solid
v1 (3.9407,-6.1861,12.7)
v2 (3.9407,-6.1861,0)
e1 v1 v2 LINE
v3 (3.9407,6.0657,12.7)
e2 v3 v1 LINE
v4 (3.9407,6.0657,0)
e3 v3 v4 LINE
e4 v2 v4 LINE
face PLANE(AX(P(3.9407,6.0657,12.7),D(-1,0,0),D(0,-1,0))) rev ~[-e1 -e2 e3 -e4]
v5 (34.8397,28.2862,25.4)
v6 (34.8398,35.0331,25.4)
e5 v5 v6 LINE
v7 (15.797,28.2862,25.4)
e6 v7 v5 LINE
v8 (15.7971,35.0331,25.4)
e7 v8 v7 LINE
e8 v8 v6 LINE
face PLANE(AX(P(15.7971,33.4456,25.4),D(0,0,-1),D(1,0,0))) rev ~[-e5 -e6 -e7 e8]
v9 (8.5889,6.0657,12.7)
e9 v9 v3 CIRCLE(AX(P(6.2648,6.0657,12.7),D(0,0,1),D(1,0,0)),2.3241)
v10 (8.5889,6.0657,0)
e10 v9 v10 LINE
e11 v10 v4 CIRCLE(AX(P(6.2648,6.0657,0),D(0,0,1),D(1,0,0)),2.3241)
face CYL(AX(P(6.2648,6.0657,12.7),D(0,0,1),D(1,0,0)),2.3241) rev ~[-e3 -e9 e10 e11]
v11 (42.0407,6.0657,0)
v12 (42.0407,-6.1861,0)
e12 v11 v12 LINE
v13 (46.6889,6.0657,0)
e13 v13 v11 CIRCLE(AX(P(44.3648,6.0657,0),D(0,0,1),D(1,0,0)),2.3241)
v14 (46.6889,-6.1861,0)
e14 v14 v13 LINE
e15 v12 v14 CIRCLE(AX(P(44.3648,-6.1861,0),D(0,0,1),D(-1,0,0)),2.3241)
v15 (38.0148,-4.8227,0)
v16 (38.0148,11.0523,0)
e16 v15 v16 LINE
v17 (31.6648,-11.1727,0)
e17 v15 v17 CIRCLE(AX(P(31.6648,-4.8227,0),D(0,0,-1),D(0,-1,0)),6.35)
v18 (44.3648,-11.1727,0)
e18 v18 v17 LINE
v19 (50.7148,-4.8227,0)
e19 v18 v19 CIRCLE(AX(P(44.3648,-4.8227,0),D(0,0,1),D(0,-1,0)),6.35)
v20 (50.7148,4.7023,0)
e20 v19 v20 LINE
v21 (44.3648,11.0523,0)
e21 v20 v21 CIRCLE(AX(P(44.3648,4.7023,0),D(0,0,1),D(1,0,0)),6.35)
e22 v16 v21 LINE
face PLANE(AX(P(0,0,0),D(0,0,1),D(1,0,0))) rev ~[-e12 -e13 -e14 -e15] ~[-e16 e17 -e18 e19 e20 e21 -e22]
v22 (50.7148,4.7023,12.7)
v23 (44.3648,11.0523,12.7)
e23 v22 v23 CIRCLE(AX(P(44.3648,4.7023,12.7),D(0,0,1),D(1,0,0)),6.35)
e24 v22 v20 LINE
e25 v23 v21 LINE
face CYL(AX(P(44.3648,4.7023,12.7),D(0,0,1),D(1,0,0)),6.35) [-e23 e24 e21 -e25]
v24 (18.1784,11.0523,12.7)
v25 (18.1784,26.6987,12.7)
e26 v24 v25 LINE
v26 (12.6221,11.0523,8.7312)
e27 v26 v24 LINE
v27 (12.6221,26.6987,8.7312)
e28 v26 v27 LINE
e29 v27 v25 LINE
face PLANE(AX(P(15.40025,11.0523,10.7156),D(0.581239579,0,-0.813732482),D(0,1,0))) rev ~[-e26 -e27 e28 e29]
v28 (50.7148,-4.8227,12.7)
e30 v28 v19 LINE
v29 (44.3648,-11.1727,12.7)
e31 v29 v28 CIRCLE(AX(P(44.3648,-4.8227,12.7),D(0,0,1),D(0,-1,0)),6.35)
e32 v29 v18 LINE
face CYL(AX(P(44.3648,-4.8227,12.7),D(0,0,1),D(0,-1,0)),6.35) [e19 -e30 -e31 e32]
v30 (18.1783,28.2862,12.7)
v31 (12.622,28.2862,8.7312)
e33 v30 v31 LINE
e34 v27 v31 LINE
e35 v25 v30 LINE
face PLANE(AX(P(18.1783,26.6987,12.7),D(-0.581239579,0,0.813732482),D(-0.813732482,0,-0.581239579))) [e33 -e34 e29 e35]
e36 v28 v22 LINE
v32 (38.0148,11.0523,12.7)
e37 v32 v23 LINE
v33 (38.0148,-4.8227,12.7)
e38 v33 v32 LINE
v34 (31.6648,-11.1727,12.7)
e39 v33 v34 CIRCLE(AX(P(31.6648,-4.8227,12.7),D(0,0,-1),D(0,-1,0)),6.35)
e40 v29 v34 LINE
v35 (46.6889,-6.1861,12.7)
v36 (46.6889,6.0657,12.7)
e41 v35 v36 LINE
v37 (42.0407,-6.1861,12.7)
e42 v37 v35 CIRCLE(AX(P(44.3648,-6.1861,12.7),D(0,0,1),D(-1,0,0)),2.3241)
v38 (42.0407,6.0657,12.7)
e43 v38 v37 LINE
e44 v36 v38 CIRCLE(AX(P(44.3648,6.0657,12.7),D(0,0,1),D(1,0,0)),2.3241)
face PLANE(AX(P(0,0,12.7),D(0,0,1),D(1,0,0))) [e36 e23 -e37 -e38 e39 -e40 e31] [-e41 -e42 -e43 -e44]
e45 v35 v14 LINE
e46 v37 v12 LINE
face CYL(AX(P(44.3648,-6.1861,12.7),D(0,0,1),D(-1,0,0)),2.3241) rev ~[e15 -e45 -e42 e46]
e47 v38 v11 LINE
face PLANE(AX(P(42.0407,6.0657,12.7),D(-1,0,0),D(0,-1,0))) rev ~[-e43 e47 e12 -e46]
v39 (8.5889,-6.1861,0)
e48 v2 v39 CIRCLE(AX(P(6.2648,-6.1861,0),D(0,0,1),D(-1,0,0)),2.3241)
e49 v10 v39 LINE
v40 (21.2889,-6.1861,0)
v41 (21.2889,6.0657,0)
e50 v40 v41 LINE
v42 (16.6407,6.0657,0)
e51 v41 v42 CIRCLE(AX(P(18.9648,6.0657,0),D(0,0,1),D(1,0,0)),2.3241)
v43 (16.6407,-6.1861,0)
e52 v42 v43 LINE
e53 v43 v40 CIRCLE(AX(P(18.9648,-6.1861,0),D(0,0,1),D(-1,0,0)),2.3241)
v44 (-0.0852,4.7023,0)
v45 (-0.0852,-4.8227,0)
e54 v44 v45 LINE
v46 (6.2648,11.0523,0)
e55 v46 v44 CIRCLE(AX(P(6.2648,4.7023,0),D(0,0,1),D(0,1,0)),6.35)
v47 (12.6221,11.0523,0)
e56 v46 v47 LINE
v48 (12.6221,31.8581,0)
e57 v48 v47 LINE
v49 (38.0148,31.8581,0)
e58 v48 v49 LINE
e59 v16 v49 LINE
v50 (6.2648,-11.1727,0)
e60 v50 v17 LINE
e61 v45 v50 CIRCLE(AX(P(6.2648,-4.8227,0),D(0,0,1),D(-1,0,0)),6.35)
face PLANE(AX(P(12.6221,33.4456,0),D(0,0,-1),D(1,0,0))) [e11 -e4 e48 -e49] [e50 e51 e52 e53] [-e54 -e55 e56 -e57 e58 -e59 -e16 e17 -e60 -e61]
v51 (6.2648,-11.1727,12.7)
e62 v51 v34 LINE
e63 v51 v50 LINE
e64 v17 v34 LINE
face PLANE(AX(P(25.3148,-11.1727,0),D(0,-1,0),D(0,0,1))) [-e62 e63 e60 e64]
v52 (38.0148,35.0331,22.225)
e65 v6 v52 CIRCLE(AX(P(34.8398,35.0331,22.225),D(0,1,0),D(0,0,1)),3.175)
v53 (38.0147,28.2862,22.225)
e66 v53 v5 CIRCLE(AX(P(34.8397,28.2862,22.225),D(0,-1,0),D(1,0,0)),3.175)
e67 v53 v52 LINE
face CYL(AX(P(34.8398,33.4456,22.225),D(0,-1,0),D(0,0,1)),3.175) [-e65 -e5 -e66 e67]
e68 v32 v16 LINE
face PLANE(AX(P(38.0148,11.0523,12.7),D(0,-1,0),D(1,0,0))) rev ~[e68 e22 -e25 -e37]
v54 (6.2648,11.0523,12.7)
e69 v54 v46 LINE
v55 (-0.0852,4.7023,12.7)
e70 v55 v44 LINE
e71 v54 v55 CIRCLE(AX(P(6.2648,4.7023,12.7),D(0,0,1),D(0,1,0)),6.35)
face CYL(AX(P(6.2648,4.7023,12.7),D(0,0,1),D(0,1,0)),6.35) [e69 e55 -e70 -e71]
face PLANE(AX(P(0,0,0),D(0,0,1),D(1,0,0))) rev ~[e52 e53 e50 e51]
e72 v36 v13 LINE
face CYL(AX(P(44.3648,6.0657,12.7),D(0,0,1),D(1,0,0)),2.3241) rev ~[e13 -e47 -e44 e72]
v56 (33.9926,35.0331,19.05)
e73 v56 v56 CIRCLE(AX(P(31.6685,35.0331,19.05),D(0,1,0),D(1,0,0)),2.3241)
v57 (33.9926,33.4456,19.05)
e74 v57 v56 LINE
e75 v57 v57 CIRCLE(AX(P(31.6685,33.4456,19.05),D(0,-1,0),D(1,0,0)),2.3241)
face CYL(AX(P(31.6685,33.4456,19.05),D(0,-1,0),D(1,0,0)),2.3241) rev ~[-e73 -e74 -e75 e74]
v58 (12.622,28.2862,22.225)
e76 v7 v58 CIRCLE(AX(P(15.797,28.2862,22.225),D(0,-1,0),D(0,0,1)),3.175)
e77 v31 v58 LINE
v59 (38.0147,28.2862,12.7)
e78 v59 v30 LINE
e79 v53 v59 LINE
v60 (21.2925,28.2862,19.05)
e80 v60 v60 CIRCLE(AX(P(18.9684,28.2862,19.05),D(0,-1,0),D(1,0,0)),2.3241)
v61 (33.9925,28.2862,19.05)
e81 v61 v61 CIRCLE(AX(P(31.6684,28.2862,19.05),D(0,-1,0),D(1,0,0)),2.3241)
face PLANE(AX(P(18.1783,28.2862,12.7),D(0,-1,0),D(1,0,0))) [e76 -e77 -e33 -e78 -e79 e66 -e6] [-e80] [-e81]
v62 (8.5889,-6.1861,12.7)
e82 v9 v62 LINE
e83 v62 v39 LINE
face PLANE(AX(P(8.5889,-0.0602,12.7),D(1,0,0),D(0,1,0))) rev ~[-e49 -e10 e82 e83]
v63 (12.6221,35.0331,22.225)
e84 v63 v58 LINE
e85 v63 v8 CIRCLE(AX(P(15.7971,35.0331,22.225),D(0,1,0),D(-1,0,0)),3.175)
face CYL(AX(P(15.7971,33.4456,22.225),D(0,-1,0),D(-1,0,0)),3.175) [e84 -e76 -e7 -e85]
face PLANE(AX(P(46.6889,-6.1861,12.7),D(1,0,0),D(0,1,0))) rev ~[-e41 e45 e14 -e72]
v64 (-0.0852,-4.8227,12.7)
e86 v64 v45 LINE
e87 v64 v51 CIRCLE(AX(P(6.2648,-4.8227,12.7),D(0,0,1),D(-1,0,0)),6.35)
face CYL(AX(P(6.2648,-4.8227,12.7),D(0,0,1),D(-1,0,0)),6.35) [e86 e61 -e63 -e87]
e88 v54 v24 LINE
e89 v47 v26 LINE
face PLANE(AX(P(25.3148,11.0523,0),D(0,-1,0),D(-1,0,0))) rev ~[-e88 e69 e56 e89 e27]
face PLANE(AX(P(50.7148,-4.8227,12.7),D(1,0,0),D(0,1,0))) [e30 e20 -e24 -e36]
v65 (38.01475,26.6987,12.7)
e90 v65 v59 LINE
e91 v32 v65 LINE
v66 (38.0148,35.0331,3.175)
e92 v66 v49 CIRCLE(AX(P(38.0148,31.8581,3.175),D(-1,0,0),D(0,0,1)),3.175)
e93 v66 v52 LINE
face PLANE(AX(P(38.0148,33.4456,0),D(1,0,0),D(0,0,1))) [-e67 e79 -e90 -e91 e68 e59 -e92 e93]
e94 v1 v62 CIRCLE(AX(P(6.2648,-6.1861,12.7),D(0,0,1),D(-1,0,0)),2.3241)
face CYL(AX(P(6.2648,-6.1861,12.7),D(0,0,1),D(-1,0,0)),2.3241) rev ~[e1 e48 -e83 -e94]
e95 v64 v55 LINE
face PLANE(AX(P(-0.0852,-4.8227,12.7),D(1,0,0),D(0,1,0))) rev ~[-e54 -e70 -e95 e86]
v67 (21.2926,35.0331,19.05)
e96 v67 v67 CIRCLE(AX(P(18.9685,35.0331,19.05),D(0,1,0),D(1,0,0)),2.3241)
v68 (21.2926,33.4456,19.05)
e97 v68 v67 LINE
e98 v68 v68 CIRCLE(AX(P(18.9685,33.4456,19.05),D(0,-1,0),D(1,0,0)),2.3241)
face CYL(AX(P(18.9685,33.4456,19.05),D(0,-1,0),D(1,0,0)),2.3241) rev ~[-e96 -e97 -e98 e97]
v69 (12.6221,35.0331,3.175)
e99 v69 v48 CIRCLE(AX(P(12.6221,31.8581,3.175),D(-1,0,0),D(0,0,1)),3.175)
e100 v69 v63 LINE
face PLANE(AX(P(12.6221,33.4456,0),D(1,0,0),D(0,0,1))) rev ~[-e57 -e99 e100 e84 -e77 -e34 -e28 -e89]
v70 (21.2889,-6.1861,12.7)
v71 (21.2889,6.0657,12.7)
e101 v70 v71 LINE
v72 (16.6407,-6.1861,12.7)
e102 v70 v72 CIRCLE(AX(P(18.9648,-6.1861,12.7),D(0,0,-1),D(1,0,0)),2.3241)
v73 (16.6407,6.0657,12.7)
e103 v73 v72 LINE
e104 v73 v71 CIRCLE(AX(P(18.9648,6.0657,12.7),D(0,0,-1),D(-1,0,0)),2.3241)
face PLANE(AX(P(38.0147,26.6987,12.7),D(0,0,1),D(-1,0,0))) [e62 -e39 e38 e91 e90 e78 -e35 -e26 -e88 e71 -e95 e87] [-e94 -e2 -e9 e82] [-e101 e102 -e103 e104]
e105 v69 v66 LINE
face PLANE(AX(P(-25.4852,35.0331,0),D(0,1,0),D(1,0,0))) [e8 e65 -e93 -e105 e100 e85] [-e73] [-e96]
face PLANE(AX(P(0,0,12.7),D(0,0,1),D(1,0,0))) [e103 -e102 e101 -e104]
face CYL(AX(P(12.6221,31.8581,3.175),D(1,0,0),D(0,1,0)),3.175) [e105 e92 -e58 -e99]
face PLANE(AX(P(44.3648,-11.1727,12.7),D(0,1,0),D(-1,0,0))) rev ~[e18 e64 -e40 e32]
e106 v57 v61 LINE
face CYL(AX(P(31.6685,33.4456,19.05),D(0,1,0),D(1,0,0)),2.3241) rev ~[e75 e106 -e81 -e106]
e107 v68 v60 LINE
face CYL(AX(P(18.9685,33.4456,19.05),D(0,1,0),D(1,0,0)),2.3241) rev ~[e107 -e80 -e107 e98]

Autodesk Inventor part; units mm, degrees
ref_plane "YZ Plane" through (0, 0, 0) normal (1, 0, 0) x (0, 1, 0)
ref_plane "XZ Plane" through (0, 0, 0) normal (0, 1, 0) x (-1, 0, 0)
ref_plane "XY Plane" through (0, 0, 0) normal (0, 0, 1) x (1, 0, 0)
sketch "Sketch1" plane through (0, 0, 0) normal (0, 0, 1) x (1, 0, 0)
  line L0 (-19.1352, -8.5102) -> (-19.1352, 8.3898) construction
  line L1 (-16.8111, -6.1861) -> (-16.8111, 6.0657)
  line L2 (-21.4593, 6.0657) -> (-21.4593, -6.1861)
  arc A0 (-21.4593, -6.1861) -> (-16.8111, -6.1861) centre (-19.1352, -6.1861) ccw
  arc A1 (-16.8111, 6.0657) -> (-21.4593, 6.0657) centre (-19.1352, 6.0657) ccw
  line L3 (18.9648, -8.5102) -> (18.9648, 8.3898) construction
  line L4 (21.2889, -6.1861) -> (21.2889, 6.0657)
  line L5 (16.6407, 6.0657) -> (16.6407, -6.1861)
  arc A2 (16.6407, -6.1861) -> (21.2889, -6.1861) centre (18.9648, -6.1861) ccw
  arc A3 (21.2889, 6.0657) -> (16.6407, 6.0657) centre (18.9648, 6.0657) ccw
  line L6 (-19.1352, 8.3898) -> (18.9648, 8.3898)
  line L7 (18.9648, -8.5102) -> (-19.1352, -8.5102)
  line L8 (25.3148, 11.0523) -> (-25.4852, 11.0523)
  line L9 (-25.4852, 11.0523) -> (-25.4852, -11.1727)
  line L10 (-25.4852, -11.1727) -> (25.3148, -11.1727)
  line L11 (25.3148, -11.1727) -> (25.3148, 11.0523)
  line L12 (25.3148, 11.0523) -> (-25.4852, -11.1727) construction
  line L13 (-25.4852, 11.0523) -> (25.3148, -11.1727) construction
  point P0 (0, 0)
  point P1 (-0.0852, -0.0602)
  point P2 (-19.1352, -0.0602)
  point P3 (18.9648, -0.0602)
  dimension "d0" = 4.6482
  dimension "d1" = 4.6482
  dimension "d2" = 50.8
  dimension "d3" = 22.225
extrude "Extrusion1" add sketch "Sketch1" along normal blind 12.7 contours L1 A1 L6 A3 L5 A2 L7 A0 | L11 L10 L9 L8
sketch "Sketch2" plane through (-25.4852, 11.0523, 0) normal (0, 1, 0) x (1, 0, 0)
  line L0 (0, 0) -> (50.8, 0) projected
  line L1 (0, 0) -> (12.7, 0)
  line L2 (12.7, 0) -> (12.7, -12.7)
  line L3 (12.7, -12.7) -> (0, -12.7)
  line L4 (0, -12.7) -> (0, 0)
  line L5 (50.8073, 0) -> (38.1073, 0)
  line L6 (38.1073, 0) -> (38.1073, -12.7)
  line L7 (38.1073, -12.7) -> (50.8073, -12.7)
  line L8 (50.8, 0) -> (50.8, -12.7) projected
  line L9 (50.8, 0) -> (50.8, -12.7) projected
  line L10 (50.8, -12.7) -> (50.8, 0)
  line L11 (50.8, 0) -> (38.1073, 0)
  point P0 (25.4852, 0)
  dimension "d7" = 12.7
  dimension "d8" = 12.7
  dimension "d9" = 12.7
  dimension "d10" = 12.7
extrude "Extrusion2" add sketch "Sketch2" along normal blind 22.3933
chamfer "Chamfer1" distance 3.9688 distance2 5.5563 1 edges at (12.6221, 22.2489, 12.7) measured on face at (12.6221, 18.5167, 4.2333)
chamfer "Chamfer2" distance 4.7625 distance2 7.9375 1 edges at (-12.7852, 22.2489, 0) measured on face at (-12.7852, 18.5167, 8.4667)
sketch "Sketch3" plane through (-25.4852, 33.4456, 0) normal (0, 1, 0) x (1, 0, 0)
  line L0 (0, 0) -> (6.319, 0)
  line L1 (38.1073, 0) -> (4.7625, 0) projected
  line L2 (6.319, -0.6519) -> (0, -0.6519)
  line L3 (0, 0) -> (0, -12.7) projected
  line L4 (0, 0) -> (0, -0.6519)
  line L5 (6.319, 0) -> (6.319, -0.6519)
  point P0 (25.4852, 0)
extrude "Extrusion3" cut sketch "Sketch3" against normal up to surface (22.3933 mm away)
fillet "Fillet2" radius 3.175 2 edges at (-19.6363, 22.2489, 0.6519) (-25.4852, 22.2489, 0.6519)
sketch "Sketch4" plane through (0, 0, 12.7) normal (0, 0, 1) x (1, 0, 0)
  line L0 (-12.7852, 11.0523) -> (-18.8822, 11.0523) projected
  line L1 (-12.7852, 11.0523) -> (-12.7852, 26.6987)
  line L2 (-12.7852, 33.4456) -> (-12.7852, 11.0523) projected
  line L3 (-12.7852, 11.0523) -> (25.3148, 11.0523)
  line L4 (25.3148, -11.1727) -> (25.3148, 33.4456) projected
  line L5 (25.3148, 11.0523) -> (25.3148, 26.6987)
  line L6 (12.6221, 33.4456) -> (12.6221, 11.0523) projected
  line L7 (-25.4852, -11.1727) -> (-25.4852, 33.4456) projected
  line L8 (25.3148, 26.6987) -> (12.6221, 26.6987)
  line L9 (12.6221, 26.6987) -> (12.6221, 36.2237)
  line L10 (25.3148, 36.2237) -> (25.3148, 26.6987)
  line L11 (-12.7852, 26.6987) -> (-25.4852, 26.6987)
  line L12 (-25.4852, 26.6987) -> (-25.4852, 36.2237)
  line L13 (-12.7852, 36.2237) -> (-12.7852, 26.6987)
  line L14 (18.1783, 33.4456) -> (12.6221, 33.4456) projected
  line L15 (25.3148, 33.4456) -> (12.6221, 33.4456)
  line L16 (-12.7852, 36.2237) -> (-12.7852, 33.4456)
  line L17 (-25.4852, 33.4456) -> (-12.7852, 33.4456) projected
  line L18 (-12.7852, 33.4456) -> (-25.4852, 33.4456)
  line L19 (-25.4852, 33.4456) -> (-25.4852, 36.2237)
  line L20 (12.6221, 33.4456) -> (12.6221, 26.6987)
  line L21 (25.3148, 26.6987) -> (25.3148, 33.4456)
  line L22 (-12.7852, 26.6987) -> (-12.7852, 33.4456)
  line L23 (-25.4852, 26.6987) -> (-25.4852, 33.4456)
  point P0 (0, 0)
  dimension "d22" = 15.6464
extrude "Extrusion4" add sketch "Sketch4" along normal blind 12.7 contours L2 L11 L7 L17 | L6 L14 L15 L4 L8
extrude "Extrusion5" add sketch "Sketch4" against normal blind 4.2333 contours L6 L14 L15 L4 L8
sketch "Sketch5" plane through (-25.4852, 33.4456, 0) normal (0, 1, 0) x (1, 0, 0)
  line L0 (50.8, -25.4) -> (38.1073, -25.4) projected
  line L1 (12.7, -25.4) -> (0, -25.4) projected
  line L2 (44.4537, -25.4) -> (44.4537, -19.05)
  line L3 (6.35, -25.4) -> (6.35, -19.05)
  circle A0 centre (6.35, -19.05) radius 2.3241
  circle A1 centre (44.4537, -19.05) radius 2.3241
  point P0 (25.4852, 0)
  dimension "d27" = 6.35
  dimension "d28" = 6.35
  dimension "d29" = 4.6482
  dimension "d30" = 4.6482
extrude "Extrusion6" cut sketch "Sketch5" against normal through all
sketch "Sketch6" plane through (-12.7852, 11.0523, 12.7) normal (1, 0, 0) x (0, 0, -1)
  line L0 (-12.7, 15.6464) -> (-12.7, 22.3933) projected
  line L1 (0, 15.6464) -> (-12.7, 15.6464) projected
  line L2 (-12.7, 15.6464) -> (-12.7, 22.3933)
  line L3 (-12.7, 22.3933) -> (0, 22.3933)
  line L4 (0, 22.3933) -> (0, 15.6464)
  line L5 (0, 15.6464) -> (-12.7, 15.6464)
  point P0 (12.7, -11.0523)
extrude "Extrusion7" [suppressed]
sketch "Sketch7" plane through (18.1783, 26.6987, 12.7) normal (0, -1, 0) x (1, 0, 0)
  circle A0 centre (-37.3136, 6.35) radius 2.3241 projected
  circle A1 centre (0.7901, 6.35) radius 2.3241 projected
  line L0 (-37.3136, 6.35) -> (-24.6136, 6.35)
  line L1 (-24.6136, 6.35) -> (-11.9136, 6.35)
  line L2 (-26.798, 4.1656) -> (-22.4292, 4.1656)
  line L3 (-22.4292, 4.1656) -> (-22.4292, 8.5344)
  line L4 (-22.4292, 8.5344) -> (-26.798, 8.5344)
  line L5 (-26.798, 8.5344) -> (-26.798, 4.1656)
  line L6 (-26.798, 4.1656) -> (-22.4292, 8.5344) construction
  line L7 (-22.4292, 4.1656) -> (-26.798, 8.5344) construction
  line L8 (-9.7292, 8.5344) -> (-14.098, 8.5344)
  line L9 (-9.7292, 4.1656) -> (-9.7292, 8.5344)
  line L10 (-14.098, 4.1656) -> (-9.7292, 4.1656)
  line L11 (-14.098, 8.5344) -> (-14.098, 4.1656)
  point P0 (-18.1783, -12.7)
  dimension "d35" = 12.7
  dimension "d36" = 12.7
  dimension "d37" = 4.3688
  dimension "d38" = 4.3688
  dimension "d41" = 12.7
extrude "Extrusion8" [suppressed]
fillet "Fillet3" [suppressed]
sketch "Sketch8" plane through (-25.4852, 11.0523, 0) normal (0, 1, 0) x (1, 0, 0)
  line L0 (38.1073, 0) -> (0, 0) projected
  line L1 (0, 0) -> (14.6548, 0)
  line L2 (14.6548, 0) -> (14.6548, -26.951)
  line L3 (14.6548, -26.951) -> (0, -26.951)
  line L4 (0, -26.951) -> (0, 0)
  point P0 (25.4852, 0)
  point P1 (14.6548, 0)
extrude "Extrusion9" cut sketch "Sketch8" along normal blind 25.4
sketch "Sketch9" plane through (25.3148, -11.1727, 12.7) normal (1, 0, 0) x (0, 0, -1)
  line L0 (0, 0) -> (0, 37.8714) projected
  line L1 (12.7, 0) -> (0, 0) projected
  line L2 (12.7, 0) -> (12.7, 44.6183) projected
  line L3 (12.7, 44.6183) -> (-12.7, 44.6183) projected
  line L4 (-12.7, 37.8714) -> (-12.7, 44.6183) projected
  line L5 (0, 37.8714) -> (-12.7, 37.8714) projected
  point P0 (12.7, 11.1727)
extrude "Extrusion10" add sketch "Sketch9" along normal blind 12.7
sketch "Sketch10" plane through (-25.4852, 33.4456, 0) normal (0, 1, 0) x (1, 0, 0)
  circle A0 centre (44.4537, -19.05) radius 2.3241 projected
  line L0 (44.4537, -19.05) -> (57.1537, -19.05)
  circle A1 centre (57.1537, -19.05) radius 2.3241
  point P0 (25.4852, 0)
  dimension "d58" = 12.7
  dimension "d59" = 4.6482
extrude "Extrusion11" cut sketch "Sketch10" against normal blind 12.7 contours A1
fillet "Fillet9" radius 3.175 2 edges at (12.6221, 30.0721, 25.4) (38.0148, 30.0721, 25.4)
fillet "Fillet10" radius 6.35 3 edges at (-25.4852, 11.0523, 6.35) (-25.4852, -11.1727, 6.35) (38.0148, -11.1727, 6.35)
sketch "Sketch11" plane through (-25.4852, 33.4456, 0) normal (0, 1, 0) x (1, 0, 0)
  arc A0 (60.325, -25.4) -> (63.5, -22.225) centre (60.325, -22.225) ccw projected
  line L0 (63.5, 0) -> (63.5, -22.225) projected
  line L1 (38.1073, 0) -> (63.5, 0) projected
  line L2 (38.1073, 0) -> (38.1073, -22.225) projected
  arc A1 (38.1073, -22.225) -> (41.2823, -25.4) centre (41.2823, -22.225) ccw projected
  line L3 (41.2823, -25.4) -> (60.325, -25.4) projected
  circle A2 centre (57.1537, -19.05) radius 2.3241 projected
  circle A3 centre (44.4537, -19.05) radius 2.3241 projected
  point P0 (25.4852, 0)
extrude "Extrusion12" add sketch "Sketch11" along normal blind 1.5875
sketch "Sketch12" plane through (18.1783, 26.6987, 12.7) normal (0, -1, 0) x (1, 0, 0)
  circle A0 centre (13.4901, 6.35) radius 2.3241 projected
  circle A1 centre (0.7901, 6.35) radius 2.3241 projected
  arc A2 (19.8364, 9.525) -> (16.6614, 12.7) centre (16.6614, 9.525) ccw projected
  line L0 (-2.3813, 12.7) -> (16.6614, 12.7) projected
  arc A3 (-2.3813, 12.7) -> (-5.5563, 9.525) centre (-2.3813, 9.525) ccw projected
  line L1 (-5.5563, -3.9688) -> (-5.5563, 9.525) projected
  line L2 (0, 0) -> (-5.5563, -3.9688) projected
  line L3 (19.8364, 0) -> (0, 0) projected
  line L4 (19.8364, 9.525) -> (19.8364, 0) projected
  point P0 (-18.1783, -12.7)
extrude "Extrusion13" cut sketch "Sketch12" against normal blind 1.5875
fillet "Fillet12" radius 3.175 1 edges at (25.3184, 35.0331, 0)
sketch "Sketch13" plane through (0, 0, 12.7) normal (0, 0, 1) x (1, 0, 0)
  arc A0 (31.6648, -11.1727) -> (38.0148, -4.8227) centre (31.6648, -4.8227) ccw projected
  line L0 (38.0148, 28.2862) -> (38.0148, -4.8227) projected
  line L1 (38.0148, 28.2862) -> (18.1783, 28.2862) projected
  line L2 (18.1783, 11.0523) -> (18.1783, 28.2862) projected
  line L3 (18.1783, 11.0523) -> (-19.1352, 11.0523) projected
  arc A1 (-19.1352, 11.0523) -> (-25.4852, 4.7023) centre (-19.1352, 4.7023) ccw projected
  line L4 (-25.4852, -4.8227) -> (-25.4852, 4.7023) projected
  arc A2 (-25.4852, -4.8227) -> (-19.1352, -11.1727) centre (-19.1352, -4.8227) ccw projected
  line L5 (-19.1352, -11.1727) -> (31.6648, -11.1727) projected
  arc A3 (16.6407, -6.1861) -> (21.2889, -6.1861) centre (18.9648, -6.1861) ccw projected
  line L6 (16.6407, -6.1861) -> (16.6407, 6.0657) projected
  arc A4 (21.2889, 6.0657) -> (16.6407, 6.0657) centre (18.9648, 6.0657) ccw projected
  line L7 (21.2889, 6.0657) -> (21.2889, -6.1861) projected
  arc A5 (-21.4593, -6.1861) -> (-16.8111, -6.1861) centre (-19.1352, -6.1861) ccw projected
  line L8 (-21.4593, -6.1861) -> (-21.4593, 6.0657) projected
  arc A6 (-16.8111, 6.0657) -> (-21.4593, 6.0657) centre (-19.1352, 6.0657) ccw projected
  line L9 (-16.8111, 6.0657) -> (-16.8111, -6.1861) projected
  line L10 (-19.1352, 6.0657) -> (-19.1352, -6.1861) construction
  line L11 (-21.4593, 6.0657) -> (-21.4593, -6.1861)
  line L12 (-16.8111, -6.1861) -> (-16.8111, 6.0657)
  arc A7 (-16.8111, 6.0657) -> (-21.4593, 6.0657) centre (-19.1352, 6.0657) ccw
  arc A8 (-21.4593, -6.1861) -> (-16.8111, -6.1861) centre (-19.1352, -6.1861) ccw
  line L13 (-19.1352, -0.0602) -> (-18.0483, -0.0602)
  arc A9 (8.5889, 6.0657) -> (3.9407, 6.0657) centre (6.2648, 6.0657) ccw
  line L14 (8.5889, -6.1861) -> (8.5889, 6.0657)
  line L15 (3.9407, 6.0657) -> (3.9407, -6.1861)
  arc A10 (3.9407, -6.1861) -> (8.5889, -6.1861) centre (6.2648, -6.1861) ccw
  arc A11 (46.6889, 6.0657) -> (42.0407, 6.0657) centre (44.3648, 6.0657) ccw
  line L16 (46.6889, -6.1861) -> (46.6889, 6.0657)
  arc A12 (42.0407, -6.1861) -> (46.6889, -6.1861) centre (44.3648, -6.1861) ccw
  line L17 (42.0407, 6.0657) -> (42.0407, -6.1861)
  line L18 (18.9648, -0.0602) -> (20.0517, -0.0602)
  line L19 (-25.4852, 4.7023) -> (-25.4852, -4.8227) projected
  line L20 (-25.4852, -4.8227) -> (-25.4852, 4.7023)
  arc A13 (-19.1352, 11.0523) -> (-25.4852, 4.7023) centre (-19.1352, 4.7023) ccw
  arc A14 (-25.4852, -4.8227) -> (-19.1352, -11.1727) centre (-19.1352, -4.8227) ccw
  arc A15 (6.2648, 11.0523) -> (-0.0852, 4.7023) centre (6.2648, 4.7023) ccw
  line L21 (-0.0852, -4.8227) -> (-0.0852, 4.7023)
  arc A16 (-0.0852, -4.8227) -> (6.2648, -11.1727) centre (6.2648, -4.8227) ccw
  line L22 (6.2648, -0.0602) -> (25.3148, -0.0602)
  line L23 (25.3148, -0.0602) -> (25.3148, 2.455)
  arc A17 (50.7148, 4.7023) -> (44.3648, 11.0523) centre (44.3648, 4.7023) ccw
  line L24 (50.7148, -4.8227) -> (50.7148, 4.7023)
  arc A18 (44.3648, -11.1727) -> (50.7148, -4.8227) centre (44.3648, -4.8227) ccw
  line L25 (6.2648, 11.0523) -> (44.3648, 11.0523)
  line L26 (44.3648, -11.1727) -> (6.2648, -11.1727)
  point P0 (0, 0)
  point P1 (6.2648, 11.0523)
  point P2 (6.2648, -11.1727)
  point P3 (38.0148, 11.0523)
  point P4 (31.6648, -11.1727)
  dimension "d73" = 25.4
  dimension "d80" = 38.1
  dimension "d87" = 25.4
  dimension "d92" = 19.05
extrude "Extrusion14" cut sketch "Sketch13" against normal blind 25.4 contours L5 A2 L4 A1 L3 A15 L21 A16 | L14 A10 L15 A9
extrude "Extrusion15" add sketch "Sketch13" against normal up to surface (12.7 mm away) contours A0 L0 L25 A17 L24 A18 L26 | L6 L22 L18 L7 A3 | L6 A4 L7 L22 L18
properties part number "Optical Mount 24"
